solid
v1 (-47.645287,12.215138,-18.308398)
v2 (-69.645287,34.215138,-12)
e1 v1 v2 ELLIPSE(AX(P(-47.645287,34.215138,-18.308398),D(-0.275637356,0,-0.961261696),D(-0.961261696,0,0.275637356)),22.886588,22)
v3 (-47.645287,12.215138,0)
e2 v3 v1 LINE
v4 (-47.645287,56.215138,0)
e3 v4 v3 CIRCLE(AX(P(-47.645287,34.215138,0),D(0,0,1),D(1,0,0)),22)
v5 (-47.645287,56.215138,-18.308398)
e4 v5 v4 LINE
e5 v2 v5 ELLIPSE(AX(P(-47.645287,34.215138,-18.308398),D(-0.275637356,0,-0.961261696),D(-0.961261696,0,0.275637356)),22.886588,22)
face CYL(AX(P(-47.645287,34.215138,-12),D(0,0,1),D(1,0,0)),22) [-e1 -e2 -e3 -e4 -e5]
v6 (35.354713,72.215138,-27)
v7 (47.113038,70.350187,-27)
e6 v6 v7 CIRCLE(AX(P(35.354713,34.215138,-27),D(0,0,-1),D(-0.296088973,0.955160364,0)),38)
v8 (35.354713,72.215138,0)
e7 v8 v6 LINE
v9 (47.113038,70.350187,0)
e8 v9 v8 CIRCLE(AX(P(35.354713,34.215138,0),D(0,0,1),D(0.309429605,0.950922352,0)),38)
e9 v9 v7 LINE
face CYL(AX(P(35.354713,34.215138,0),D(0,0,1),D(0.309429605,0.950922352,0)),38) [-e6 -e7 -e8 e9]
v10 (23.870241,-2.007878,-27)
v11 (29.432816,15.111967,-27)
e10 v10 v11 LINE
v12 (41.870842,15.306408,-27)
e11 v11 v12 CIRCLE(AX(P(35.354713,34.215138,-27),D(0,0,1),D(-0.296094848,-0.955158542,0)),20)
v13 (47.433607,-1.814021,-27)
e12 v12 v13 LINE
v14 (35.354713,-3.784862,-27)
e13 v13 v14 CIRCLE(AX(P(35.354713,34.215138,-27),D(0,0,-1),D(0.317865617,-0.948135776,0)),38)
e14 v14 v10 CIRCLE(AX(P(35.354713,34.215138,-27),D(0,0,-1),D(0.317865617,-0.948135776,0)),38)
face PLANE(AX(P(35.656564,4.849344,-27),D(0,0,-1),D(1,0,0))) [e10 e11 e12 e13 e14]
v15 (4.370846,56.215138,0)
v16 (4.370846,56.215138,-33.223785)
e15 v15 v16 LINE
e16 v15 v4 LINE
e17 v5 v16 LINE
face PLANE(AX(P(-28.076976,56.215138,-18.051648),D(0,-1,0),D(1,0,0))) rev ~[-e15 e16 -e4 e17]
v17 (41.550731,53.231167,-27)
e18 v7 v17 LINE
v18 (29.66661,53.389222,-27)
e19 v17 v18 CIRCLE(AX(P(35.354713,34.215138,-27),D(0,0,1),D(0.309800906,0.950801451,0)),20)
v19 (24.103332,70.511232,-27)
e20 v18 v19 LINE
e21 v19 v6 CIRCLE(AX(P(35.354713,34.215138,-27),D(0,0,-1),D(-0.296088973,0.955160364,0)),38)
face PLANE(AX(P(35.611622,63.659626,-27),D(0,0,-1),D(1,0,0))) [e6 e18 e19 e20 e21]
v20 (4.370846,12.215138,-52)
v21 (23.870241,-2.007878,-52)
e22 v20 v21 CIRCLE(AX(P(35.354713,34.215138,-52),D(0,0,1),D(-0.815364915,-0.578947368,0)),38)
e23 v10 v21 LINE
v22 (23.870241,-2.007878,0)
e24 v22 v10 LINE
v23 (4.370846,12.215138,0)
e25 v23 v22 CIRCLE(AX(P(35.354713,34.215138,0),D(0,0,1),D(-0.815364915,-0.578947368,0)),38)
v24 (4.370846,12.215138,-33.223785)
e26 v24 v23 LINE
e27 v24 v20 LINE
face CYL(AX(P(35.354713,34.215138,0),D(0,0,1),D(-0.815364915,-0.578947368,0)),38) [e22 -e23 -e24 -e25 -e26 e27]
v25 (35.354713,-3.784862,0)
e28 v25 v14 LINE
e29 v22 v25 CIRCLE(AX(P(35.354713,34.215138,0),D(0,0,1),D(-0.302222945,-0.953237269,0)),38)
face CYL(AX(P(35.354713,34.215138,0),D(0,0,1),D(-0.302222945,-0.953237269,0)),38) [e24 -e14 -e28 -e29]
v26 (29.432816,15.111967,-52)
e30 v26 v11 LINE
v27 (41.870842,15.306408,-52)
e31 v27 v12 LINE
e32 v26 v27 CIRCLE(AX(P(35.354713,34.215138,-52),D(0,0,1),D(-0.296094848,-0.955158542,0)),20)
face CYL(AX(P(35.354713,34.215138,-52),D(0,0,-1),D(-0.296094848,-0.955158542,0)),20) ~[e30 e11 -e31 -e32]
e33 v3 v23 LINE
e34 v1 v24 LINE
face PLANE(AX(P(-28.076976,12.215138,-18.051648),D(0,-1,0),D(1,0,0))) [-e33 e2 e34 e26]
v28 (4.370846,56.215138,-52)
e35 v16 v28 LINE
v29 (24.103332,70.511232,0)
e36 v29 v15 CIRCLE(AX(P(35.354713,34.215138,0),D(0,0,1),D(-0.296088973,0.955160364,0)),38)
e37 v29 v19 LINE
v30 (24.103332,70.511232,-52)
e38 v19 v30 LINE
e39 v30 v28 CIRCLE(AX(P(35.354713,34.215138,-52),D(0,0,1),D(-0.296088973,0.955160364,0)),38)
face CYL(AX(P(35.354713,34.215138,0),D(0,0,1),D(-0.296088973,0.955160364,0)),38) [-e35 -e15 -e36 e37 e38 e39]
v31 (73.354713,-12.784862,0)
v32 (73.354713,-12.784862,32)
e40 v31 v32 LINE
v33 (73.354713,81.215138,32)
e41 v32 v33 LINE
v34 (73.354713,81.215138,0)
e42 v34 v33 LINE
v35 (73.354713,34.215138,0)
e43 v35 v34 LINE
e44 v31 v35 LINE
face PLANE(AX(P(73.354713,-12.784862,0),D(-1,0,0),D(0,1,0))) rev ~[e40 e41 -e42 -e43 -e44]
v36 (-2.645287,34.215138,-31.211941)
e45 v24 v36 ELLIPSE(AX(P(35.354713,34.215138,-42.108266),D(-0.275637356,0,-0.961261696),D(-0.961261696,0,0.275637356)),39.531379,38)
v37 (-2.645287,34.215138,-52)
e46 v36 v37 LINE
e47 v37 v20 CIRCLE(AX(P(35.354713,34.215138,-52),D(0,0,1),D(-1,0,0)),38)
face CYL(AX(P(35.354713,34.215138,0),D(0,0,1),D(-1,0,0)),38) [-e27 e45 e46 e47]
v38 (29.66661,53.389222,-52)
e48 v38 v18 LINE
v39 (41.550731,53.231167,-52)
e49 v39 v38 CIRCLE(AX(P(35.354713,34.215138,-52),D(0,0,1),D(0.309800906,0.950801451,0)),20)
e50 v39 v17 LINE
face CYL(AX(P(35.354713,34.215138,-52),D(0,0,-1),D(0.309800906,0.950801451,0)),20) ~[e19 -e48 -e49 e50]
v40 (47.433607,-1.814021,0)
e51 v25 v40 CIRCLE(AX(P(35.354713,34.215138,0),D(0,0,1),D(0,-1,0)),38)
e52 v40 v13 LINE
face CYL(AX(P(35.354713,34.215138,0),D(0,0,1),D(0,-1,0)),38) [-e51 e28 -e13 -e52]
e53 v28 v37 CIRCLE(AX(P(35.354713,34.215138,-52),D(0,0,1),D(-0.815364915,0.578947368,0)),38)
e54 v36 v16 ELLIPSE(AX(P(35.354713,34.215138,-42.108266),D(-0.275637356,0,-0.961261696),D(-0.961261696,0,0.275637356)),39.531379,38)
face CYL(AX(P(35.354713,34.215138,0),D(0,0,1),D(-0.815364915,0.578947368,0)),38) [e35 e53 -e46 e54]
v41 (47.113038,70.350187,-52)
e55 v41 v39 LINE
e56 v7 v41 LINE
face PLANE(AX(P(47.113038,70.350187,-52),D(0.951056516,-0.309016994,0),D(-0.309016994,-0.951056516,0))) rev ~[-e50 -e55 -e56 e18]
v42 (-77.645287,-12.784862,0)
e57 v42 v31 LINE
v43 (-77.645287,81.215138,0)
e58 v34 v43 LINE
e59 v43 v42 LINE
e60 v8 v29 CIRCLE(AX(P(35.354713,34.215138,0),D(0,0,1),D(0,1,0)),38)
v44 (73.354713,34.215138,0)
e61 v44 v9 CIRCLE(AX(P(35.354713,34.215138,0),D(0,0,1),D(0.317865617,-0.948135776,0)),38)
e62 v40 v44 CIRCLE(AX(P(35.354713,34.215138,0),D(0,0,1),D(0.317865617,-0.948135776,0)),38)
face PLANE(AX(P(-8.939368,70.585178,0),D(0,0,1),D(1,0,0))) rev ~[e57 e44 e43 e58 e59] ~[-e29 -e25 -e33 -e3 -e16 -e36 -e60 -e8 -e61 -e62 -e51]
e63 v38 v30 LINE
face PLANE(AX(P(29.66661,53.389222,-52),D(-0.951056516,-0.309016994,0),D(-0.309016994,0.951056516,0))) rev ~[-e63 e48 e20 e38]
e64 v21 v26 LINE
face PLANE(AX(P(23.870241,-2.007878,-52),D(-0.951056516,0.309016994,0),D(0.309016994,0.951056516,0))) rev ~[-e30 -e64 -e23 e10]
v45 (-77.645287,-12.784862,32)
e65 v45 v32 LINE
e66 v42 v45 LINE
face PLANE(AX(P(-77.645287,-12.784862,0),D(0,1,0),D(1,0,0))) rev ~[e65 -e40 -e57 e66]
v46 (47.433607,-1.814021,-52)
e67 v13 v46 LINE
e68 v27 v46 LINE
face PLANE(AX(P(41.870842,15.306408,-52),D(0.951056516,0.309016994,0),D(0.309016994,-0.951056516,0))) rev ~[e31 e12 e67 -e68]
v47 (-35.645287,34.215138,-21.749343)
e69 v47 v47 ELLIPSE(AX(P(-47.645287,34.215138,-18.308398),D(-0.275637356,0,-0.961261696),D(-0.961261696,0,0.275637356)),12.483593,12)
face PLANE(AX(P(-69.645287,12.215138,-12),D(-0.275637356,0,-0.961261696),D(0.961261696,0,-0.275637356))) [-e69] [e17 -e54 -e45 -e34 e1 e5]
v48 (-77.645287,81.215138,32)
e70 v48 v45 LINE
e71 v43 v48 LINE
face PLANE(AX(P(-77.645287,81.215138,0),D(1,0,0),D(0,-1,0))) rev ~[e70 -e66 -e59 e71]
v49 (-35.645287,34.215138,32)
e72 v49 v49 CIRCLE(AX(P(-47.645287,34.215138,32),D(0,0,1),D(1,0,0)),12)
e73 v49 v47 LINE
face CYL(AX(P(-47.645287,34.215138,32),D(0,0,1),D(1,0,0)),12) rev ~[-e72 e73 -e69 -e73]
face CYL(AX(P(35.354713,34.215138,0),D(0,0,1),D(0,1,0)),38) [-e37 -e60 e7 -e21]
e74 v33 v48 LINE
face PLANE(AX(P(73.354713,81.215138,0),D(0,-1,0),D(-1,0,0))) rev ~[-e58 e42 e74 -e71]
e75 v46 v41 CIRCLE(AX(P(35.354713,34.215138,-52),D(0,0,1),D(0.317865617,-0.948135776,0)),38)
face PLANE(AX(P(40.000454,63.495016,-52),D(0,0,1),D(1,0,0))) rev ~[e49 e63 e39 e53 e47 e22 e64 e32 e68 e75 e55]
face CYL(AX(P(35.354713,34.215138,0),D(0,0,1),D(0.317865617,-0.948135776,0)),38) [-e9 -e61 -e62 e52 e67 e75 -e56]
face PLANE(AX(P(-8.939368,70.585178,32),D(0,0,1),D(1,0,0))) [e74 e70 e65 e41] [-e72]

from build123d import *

# Parameters (mm, degrees)
F0_R      = 12
F1_DEPTH  = 32
F2_DEPTH  = 12
F3_DEPTH  = 52
F5_DEPTH  = 44
F6_DEPTH  = 93.7
F7_R      = 12
F8_DEPTH  = 98.4
F9_DEPTH  = 52
F11_DEPTH = 25


# Not quite as in the source:
# - a feature names something its author has since deleted; it is built from what else it names


with BuildPart() as f1:
    # F0 (on Top) → F1 (new body)
    with BuildSketch(Plane.XY):
        with BuildLine():
            Line((35.3547130823, 81.2151380405), (-47.6452869177, 81.2151380405))
            Line((-47.6452869177, 81.2151380405), (-47.6452869177, 56.2151380405))
            Line((-47.6452869177, 56.2151380405), (4.3708463127, 56.2151380405))
            ThreePointArc((4.3708463127, 56.2151380405), (13.0601260183, 64.9877132925), (24.1033321201, 70.5112318584))
            ThreePointArc((24.1033321201, 70.5112318584), (29.6648785101, 71.7867467702), (35.3547130823, 72.2151380405))
            Line((35.3547130823, 72.2151380405), (35.3547130823, 81.2151380405))
        make_face()
        with BuildLine():
            Line((-47.6452869177, 81.2151380405), (-77.6452869177, 81.2151380405))
            Line((-77.6452869177, 81.2151380405), (-77.6452869177, -12.7848619595))
            Line((-77.6452869177, -12.7848619595), (-47.6452869177, -12.7848619595))
            Line((-47.6452869177, -12.7848619595), (35.3547130823, -12.7848619595))
            Line((35.3547130823, -12.7848619595), (35.3547130823, -3.7848619595))
            ThreePointArc((35.3547130823, -3.7848619595), (29.5441458382, -3.3379884379), (23.8702411544, -2.0078781859))
            ThreePointArc((23.8702411544, -2.0078781859), (12.9613324626, 3.5143806488), (4.3708463127, 12.2151380405))
            Line((4.3708463127, 12.2151380405), (-47.6452869177, 12.2151380405))
            ThreePointArc((-47.6452869177, 12.2151380405), (-69.6452869177, 34.2151380405), (-47.6452869177, 56.2151380405))
            Line((-47.6452869177, 56.2151380405), (-47.6452869177, 81.2151380405))
        make_face()
        with BuildLine():
            Line((4.3708463127, 56.2151380405), (-47.6452869177, 56.2151380405))
            ThreePointArc((-47.6452869177, 56.2151380405), (-32.0889377316, 49.7714872266), (-25.6452869177, 34.2151380405))
            Line((-25.6452869177, 34.2151380405), (-2.6452869177, 34.2151380405))
            ThreePointArc((-2.6452869177, 34.2151380405), (-0.8487876963, 45.7609828072), (4.3708463127, 56.2151380405))
        make_face()
        with BuildLine():
            Line((-2.6452869177, 34.2151380405), (-25.6452869177, 34.2151380405))
            ThreePointArc((-25.6452869177, 34.2151380405), (-32.0889377316, 18.6587888544), (-47.6452869177, 12.2151380405))
            Line((-47.6452869177, 12.2151380405), (4.3708463127, 12.2151380405))
            ThreePointArc((4.3708463127, 12.2151380405), (-0.8487876963, 22.6692932738), (-2.6452869177, 34.2151380405))
        make_face()
        with BuildLine():
            ThreePointArc((-25.6452869177, 34.2151380405), (-32.0889377316, 49.7714872266), (-47.6452869177, 56.2151380405))
            ThreePointArc((-47.6452869177, 56.2151380405), (-69.6452869177, 34.2151380405), (-47.6452869177, 12.2151380405))
            ThreePointArc((-47.6452869177, 12.2151380405), (-32.0889377316, 18.6587888544), (-25.6452869177, 34.2151380405))
        make_face()
        with Locations((-47.6452869177, 34.2151380405)):
            Circle(F0_R, mode=Mode.SUBTRACT)
        with Locations((-47.6452869177, 34.2151380405)):
            Circle(F0_R)
        with BuildLine():
            ThreePointArc((24.1033321201, 70.5112318584), (13.0601260183, 64.9877132925), (4.3708463127, 56.2151380405))
            ThreePointArc((4.3708463127, 56.2151380405), (-0.8487876963, 45.7609828072), (-2.6452869177, 34.2151380405))
            ThreePointArc((-2.6452869177, 34.2151380405), (-0.8487876963, 22.6692932738), (4.3708463127, 12.2151380405))
            ThreePointArc((4.3708463127, 12.2151380405), (12.9613324626, 3.5143806488), (23.8702411544, -2.0078781859))
            Line((23.8702411544, -2.0078781859), (29.4328161154, 15.111967196))
            ThreePointArc((29.4328161154, 15.111967196), (32.3600024861, 14.440616341), (35.3547130823, 14.2151380405))
            Line((35.3547130823, 14.2151380405), (35.3547130823, 54.2151380405))
            ThreePointArc((35.3547130823, 54.2151380405), (32.4808372386, 54.0075819935), (29.6666104259, 53.389221804))
            Line((29.6666104259, 53.389221804), (24.1033321201, 70.5112318584))
        make_face()
        with BuildLine():
            ThreePointArc((47.4336065252, -1.8140214445), (66.2010901048, 12.0227739351), (73.3547130823, 34.2151380405))
            ThreePointArc((73.3547130823, 34.2151380405), (66.1022036315, 56.5443078622), (47.1130380862, 70.3501874123))
            Line((47.1130380862, 70.3501874123), (41.5507311927, 53.2311670575))
            ThreePointArc((41.5507311927, 53.2311670575), (38.4915442588, 53.9676135858), (35.3547130823, 54.2151380405))
            Line((35.3547130823, 54.2151380405), (35.3547130823, 14.2151380405))
            ThreePointArc((35.3547130823, 14.2151380405), (38.6581508077, 14.4898421189), (41.8708417514, 15.306408121))
            Line((41.8708417514, 15.306408121), (47.4336065252, -1.8140214445))
        make_face()
        with BuildLine():
            Line((73.3547130823, 81.2151380405), (35.3547130823, 81.2151380405))
            Line((35.3547130823, 81.2151380405), (35.3547130823, 72.2151380405))
            ThreePointArc((35.3547130823, 72.2151380405), (41.3073647549, 71.7460045115), (47.1130380862, 70.3501874123))
            ThreePointArc((47.1130380862, 70.3501874123), (66.1022036315, 56.5443078622), (73.3547130823, 34.2151380405))
            Line((73.3547130823, 34.2151380405), (73.3547130823, 81.2151380405))
        make_face()
        with BuildLine():
            Line((35.3547130823, 14.2151380405), (35.3547130823, -3.7848619595))
            ThreePointArc((35.3547130823, -3.7848619595), (41.4740243005, -3.2889154766), (47.4336065252, -1.8140214445))
            Line((47.4336065252, -1.8140214445), (41.8708417514, 15.306408121))
            ThreePointArc((41.8708417514, 15.306408121), (38.6581508077, 14.4898421189), (35.3547130823, 14.2151380405))
        make_face()
        with BuildLine():
            ThreePointArc((23.8702411544, -2.0078781859), (29.5441458382, -3.3379884379), (35.3547130823, -3.7848619595))
            Line((35.3547130823, -3.7848619595), (35.3547130823, 14.2151380405))
            ThreePointArc((35.3547130823, 14.2151380405), (32.3600024861, 14.440616341), (29.4328161154, 15.111967196))
            Line((29.4328161154, 15.111967196), (23.8702411544, -2.0078781859))
        make_face()
        with BuildLine():
            Line((35.3547130823, 54.2151380405), (35.3547130823, 72.2151380405))
            ThreePointArc((35.3547130823, 72.2151380405), (29.6648785101, 71.7867467702), (24.1033321201, 70.5112318584))
            Line((24.1033321201, 70.5112318584), (29.6666104259, 53.389221804))
            ThreePointArc((29.6666104259, 53.389221804), (32.4808372386, 54.0075819935), (35.3547130823, 54.2151380405))
        make_face()
        with BuildLine():
            ThreePointArc((47.1130380862, 70.3501874123), (41.3073647549, 71.7460045115), (35.3547130823, 72.2151380405))
            Line((35.3547130823, 72.2151380405), (35.3547130823, 54.2151380405))
            ThreePointArc((35.3547130823, 54.2151380405), (38.4915442588, 53.9676135858), (41.5507311927, 53.2311670575))
            Line((41.5507311927, 53.2311670575), (47.1130380862, 70.3501874123))
        make_face()
        with BuildLine():
            Line((35.3547130823, -3.7848619595), (35.3547130823, -12.7848619595))
            Line((35.3547130823, -12.7848619595), (73.3547130823, -12.7848619595))
            Line((73.3547130823, -12.7848619595), (73.3547130823, 34.2151380405))
            ThreePointArc((73.3547130823, 34.2151380405), (66.2010901048, 12.0227739351), (47.4336065252, -1.8140214445))
            ThreePointArc((47.4336065252, -1.8140214445), (41.4740243005, -3.2889154766), (35.3547130823, -3.7848619595))
        make_face()
    extrude(amount=F1_DEPTH)

    # F0 (on Top) → F2 (join)
    with BuildSketch(Plane.XY):
        with BuildLine():
            ThreePointArc((-25.6452869177, 34.2151380405), (-32.0889377316, 49.7714872266), (-47.6452869177, 56.2151380405))
            ThreePointArc((-47.6452869177, 56.2151380405), (-69.6452869177, 34.2151380405), (-47.6452869177, 12.2151380405))
            ThreePointArc((-47.6452869177, 12.2151380405), (-32.0889377316, 18.6587888544), (-25.6452869177, 34.2151380405))
        make_face()
        with Locations((-47.6452869177, 34.2151380405)):
            Circle(F0_R, mode=Mode.SUBTRACT)
        with BuildLine():
            Line((-2.6452869177, 34.2151380405), (-25.6452869177, 34.2151380405))
            ThreePointArc((-25.6452869177, 34.2151380405), (-32.0889377316, 18.6587888544), (-47.6452869177, 12.2151380405))
            Line((-47.6452869177, 12.2151380405), (4.3708463127, 12.2151380405))
            ThreePointArc((4.3708463127, 12.2151380405), (-0.8487876963, 22.6692932738), (-2.6452869177, 34.2151380405))
        make_face()
        with BuildLine():
            Line((4.3708463127, 56.2151380405), (-47.6452869177, 56.2151380405))
            ThreePointArc((-47.6452869177, 56.2151380405), (-32.0889377316, 49.7714872266), (-25.6452869177, 34.2151380405))
            Line((-25.6452869177, 34.2151380405), (-2.6452869177, 34.2151380405))
            ThreePointArc((-2.6452869177, 34.2151380405), (-0.8487876963, 45.7609828072), (4.3708463127, 56.2151380405))
        make_face()
    extrude(amount=-F2_DEPTH)

    # F0 (on Top) → F3 (join)
    with BuildSketch(Plane.XY):
        with BuildLine():
            ThreePointArc((47.4336065252, -1.8140214445), (66.2010901048, 12.0227739351), (73.3547130823, 34.2151380405))
            ThreePointArc((73.3547130823, 34.2151380405), (66.1022036315, 56.5443078622), (47.1130380862, 70.3501874123))
            Line((47.1130380862, 70.3501874123), (41.5507311927, 53.2311670575))
            ThreePointArc((41.5507311927, 53.2311670575), (38.4915442588, 53.9676135858), (35.3547130823, 54.2151380405))
            Line((35.3547130823, 54.2151380405), (35.3547130823, 14.2151380405))
            ThreePointArc((35.3547130823, 14.2151380405), (38.6581508077, 14.4898421189), (41.8708417514, 15.306408121))
            Line((41.8708417514, 15.306408121), (47.4336065252, -1.8140214445))
        make_face()
        with BuildLine():
            ThreePointArc((24.1033321201, 70.5112318584), (13.0601260183, 64.9877132925), (4.3708463127, 56.2151380405))
            ThreePointArc((4.3708463127, 56.2151380405), (-0.8487876963, 45.7609828072), (-2.6452869177, 34.2151380405))
            ThreePointArc((-2.6452869177, 34.2151380405), (-0.8487876963, 22.6692932738), (4.3708463127, 12.2151380405))
            ThreePointArc((4.3708463127, 12.2151380405), (12.9613324626, 3.5143806488), (23.8702411544, -2.0078781859))
            Line((23.8702411544, -2.0078781859), (29.4328161154, 15.111967196))
            ThreePointArc((29.4328161154, 15.111967196), (32.3600024861, 14.440616341), (35.3547130823, 14.2151380405))
            Line((35.3547130823, 14.2151380405), (35.3547130823, 54.2151380405))
            ThreePointArc((35.3547130823, 54.2151380405), (32.4808372386, 54.0075819935), (29.6666104259, 53.389221804))
            Line((29.6666104259, 53.389221804), (24.1033321201, 70.5112318584))
        make_face()
    extrude(amount=-F3_DEPTH)

    # F4 (on face) → F5 (join)
    with BuildSketch(Plane.XZ.offset(-12.2151380405)):
        Polygon((-47.6452869177, -12), (-69.6452869177, -12), (4.3708463127, -33.2237846755), (4.3708463127, -12), align=None)
    extrude(amount=-F5_DEPTH)

    # F6 (cut): faces of the model
    f6_faces = [f1.faces().sort_by_distance(p)[0] for p in [
        (-64.7311922609, 51.3010433837, -12),
        (-64.7311922609, 17.1292326973, -12),
    ]]
    extrude(f6_faces, amount=-F6_DEPTH, mode=Mode.SUBTRACT)

    # F7 (on face) → F8 (cut)
    with BuildSketch(Plane.XY.offset(32)):
        with Locations((-47.6452869177, 34.2151380405)):
            Circle(F7_R)
    extrude(amount=-F8_DEPTH, mode=Mode.SUBTRACT)

    # F0 (on Top) → F9 (join)
    with BuildSketch(Plane.XY):
        with BuildLine():
            ThreePointArc((47.1130380862, 70.3501874123), (41.3073647549, 71.7460045115), (35.3547130823, 72.2151380405))
            Line((35.3547130823, 72.2151380405), (35.3547130823, 54.2151380405))
            ThreePointArc((35.3547130823, 54.2151380405), (38.4915442588, 53.9676135858), (41.5507311927, 53.2311670575))
            Line((41.5507311927, 53.2311670575), (47.1130380862, 70.3501874123))
        make_face()
        with BuildLine():
            Line((35.3547130823, 54.2151380405), (35.3547130823, 72.2151380405))
            ThreePointArc((35.3547130823, 72.2151380405), (29.6648785101, 71.7867467702), (24.1033321201, 70.5112318584))
            Line((24.1033321201, 70.5112318584), (29.6666104259, 53.389221804))
            ThreePointArc((29.6666104259, 53.389221804), (32.4808372386, 54.0075819935), (35.3547130823, 54.2151380405))
        make_face()
        with BuildLine():
            Line((35.3547130823, 14.2151380405), (35.3547130823, -3.7848619595))
            ThreePointArc((35.3547130823, -3.7848619595), (41.4740243005, -3.2889154766), (47.4336065252, -1.8140214445))
            Line((47.4336065252, -1.8140214445), (41.8708417514, 15.306408121))
            ThreePointArc((41.8708417514, 15.306408121), (38.6581508077, 14.4898421189), (35.3547130823, 14.2151380405))
        make_face()
        with BuildLine():
            ThreePointArc((23.8702411544, -2.0078781859), (29.5441458382, -3.3379884379), (35.3547130823, -3.7848619595))
            Line((35.3547130823, -3.7848619595), (35.3547130823, 14.2151380405))
            ThreePointArc((35.3547130823, 14.2151380405), (32.3600024861, 14.440616341), (29.4328161154, 15.111967196))
            Line((29.4328161154, 15.111967196), (23.8702411544, -2.0078781859))
        make_face()
    extrude(amount=-F9_DEPTH)

    # F10 (on face) → F11 (cut)
    with BuildSketch(Plane(origin=(0, 0, -52), x_dir=(1, 0, 0), z_dir=(0, 0, -1))):
        with BuildLine():
            ThreePointArc((24.1033321201, -70.5112318584), (35.620667766, -72.2142073463), (47.1130380862, -70.3501874123))
            Line((47.1130380862, -70.3501874123), (41.5507311927, -53.2311670575))
            ThreePointArc((41.5507311927, -53.2311670575), (35.6206827287, -54.213369466), (29.6666104259, -53.389221804))
            Line((29.6666104259, -53.389221804), (24.1033321201, -70.5112318584))
        make_face()
        with BuildLine():
            ThreePointArc((29.4328161154, -15.111967196), (35.667330496, -14.2175814309), (41.8708417514, -15.306408121))
            Line((41.8708417514, -15.306408121), (47.4336065252, 1.8140214445))
            ThreePointArc((47.4336065252, 1.8140214445), (35.6673300099, 3.7835760253), (23.8702411544, 2.0078781859))
            Line((23.8702411544, 2.0078781859), (29.4328161154, -15.111967196))
        make_face()
    extrude(amount=-F11_DEPTH, mode=Mode.SUBTRACT)


solid = f1.part
